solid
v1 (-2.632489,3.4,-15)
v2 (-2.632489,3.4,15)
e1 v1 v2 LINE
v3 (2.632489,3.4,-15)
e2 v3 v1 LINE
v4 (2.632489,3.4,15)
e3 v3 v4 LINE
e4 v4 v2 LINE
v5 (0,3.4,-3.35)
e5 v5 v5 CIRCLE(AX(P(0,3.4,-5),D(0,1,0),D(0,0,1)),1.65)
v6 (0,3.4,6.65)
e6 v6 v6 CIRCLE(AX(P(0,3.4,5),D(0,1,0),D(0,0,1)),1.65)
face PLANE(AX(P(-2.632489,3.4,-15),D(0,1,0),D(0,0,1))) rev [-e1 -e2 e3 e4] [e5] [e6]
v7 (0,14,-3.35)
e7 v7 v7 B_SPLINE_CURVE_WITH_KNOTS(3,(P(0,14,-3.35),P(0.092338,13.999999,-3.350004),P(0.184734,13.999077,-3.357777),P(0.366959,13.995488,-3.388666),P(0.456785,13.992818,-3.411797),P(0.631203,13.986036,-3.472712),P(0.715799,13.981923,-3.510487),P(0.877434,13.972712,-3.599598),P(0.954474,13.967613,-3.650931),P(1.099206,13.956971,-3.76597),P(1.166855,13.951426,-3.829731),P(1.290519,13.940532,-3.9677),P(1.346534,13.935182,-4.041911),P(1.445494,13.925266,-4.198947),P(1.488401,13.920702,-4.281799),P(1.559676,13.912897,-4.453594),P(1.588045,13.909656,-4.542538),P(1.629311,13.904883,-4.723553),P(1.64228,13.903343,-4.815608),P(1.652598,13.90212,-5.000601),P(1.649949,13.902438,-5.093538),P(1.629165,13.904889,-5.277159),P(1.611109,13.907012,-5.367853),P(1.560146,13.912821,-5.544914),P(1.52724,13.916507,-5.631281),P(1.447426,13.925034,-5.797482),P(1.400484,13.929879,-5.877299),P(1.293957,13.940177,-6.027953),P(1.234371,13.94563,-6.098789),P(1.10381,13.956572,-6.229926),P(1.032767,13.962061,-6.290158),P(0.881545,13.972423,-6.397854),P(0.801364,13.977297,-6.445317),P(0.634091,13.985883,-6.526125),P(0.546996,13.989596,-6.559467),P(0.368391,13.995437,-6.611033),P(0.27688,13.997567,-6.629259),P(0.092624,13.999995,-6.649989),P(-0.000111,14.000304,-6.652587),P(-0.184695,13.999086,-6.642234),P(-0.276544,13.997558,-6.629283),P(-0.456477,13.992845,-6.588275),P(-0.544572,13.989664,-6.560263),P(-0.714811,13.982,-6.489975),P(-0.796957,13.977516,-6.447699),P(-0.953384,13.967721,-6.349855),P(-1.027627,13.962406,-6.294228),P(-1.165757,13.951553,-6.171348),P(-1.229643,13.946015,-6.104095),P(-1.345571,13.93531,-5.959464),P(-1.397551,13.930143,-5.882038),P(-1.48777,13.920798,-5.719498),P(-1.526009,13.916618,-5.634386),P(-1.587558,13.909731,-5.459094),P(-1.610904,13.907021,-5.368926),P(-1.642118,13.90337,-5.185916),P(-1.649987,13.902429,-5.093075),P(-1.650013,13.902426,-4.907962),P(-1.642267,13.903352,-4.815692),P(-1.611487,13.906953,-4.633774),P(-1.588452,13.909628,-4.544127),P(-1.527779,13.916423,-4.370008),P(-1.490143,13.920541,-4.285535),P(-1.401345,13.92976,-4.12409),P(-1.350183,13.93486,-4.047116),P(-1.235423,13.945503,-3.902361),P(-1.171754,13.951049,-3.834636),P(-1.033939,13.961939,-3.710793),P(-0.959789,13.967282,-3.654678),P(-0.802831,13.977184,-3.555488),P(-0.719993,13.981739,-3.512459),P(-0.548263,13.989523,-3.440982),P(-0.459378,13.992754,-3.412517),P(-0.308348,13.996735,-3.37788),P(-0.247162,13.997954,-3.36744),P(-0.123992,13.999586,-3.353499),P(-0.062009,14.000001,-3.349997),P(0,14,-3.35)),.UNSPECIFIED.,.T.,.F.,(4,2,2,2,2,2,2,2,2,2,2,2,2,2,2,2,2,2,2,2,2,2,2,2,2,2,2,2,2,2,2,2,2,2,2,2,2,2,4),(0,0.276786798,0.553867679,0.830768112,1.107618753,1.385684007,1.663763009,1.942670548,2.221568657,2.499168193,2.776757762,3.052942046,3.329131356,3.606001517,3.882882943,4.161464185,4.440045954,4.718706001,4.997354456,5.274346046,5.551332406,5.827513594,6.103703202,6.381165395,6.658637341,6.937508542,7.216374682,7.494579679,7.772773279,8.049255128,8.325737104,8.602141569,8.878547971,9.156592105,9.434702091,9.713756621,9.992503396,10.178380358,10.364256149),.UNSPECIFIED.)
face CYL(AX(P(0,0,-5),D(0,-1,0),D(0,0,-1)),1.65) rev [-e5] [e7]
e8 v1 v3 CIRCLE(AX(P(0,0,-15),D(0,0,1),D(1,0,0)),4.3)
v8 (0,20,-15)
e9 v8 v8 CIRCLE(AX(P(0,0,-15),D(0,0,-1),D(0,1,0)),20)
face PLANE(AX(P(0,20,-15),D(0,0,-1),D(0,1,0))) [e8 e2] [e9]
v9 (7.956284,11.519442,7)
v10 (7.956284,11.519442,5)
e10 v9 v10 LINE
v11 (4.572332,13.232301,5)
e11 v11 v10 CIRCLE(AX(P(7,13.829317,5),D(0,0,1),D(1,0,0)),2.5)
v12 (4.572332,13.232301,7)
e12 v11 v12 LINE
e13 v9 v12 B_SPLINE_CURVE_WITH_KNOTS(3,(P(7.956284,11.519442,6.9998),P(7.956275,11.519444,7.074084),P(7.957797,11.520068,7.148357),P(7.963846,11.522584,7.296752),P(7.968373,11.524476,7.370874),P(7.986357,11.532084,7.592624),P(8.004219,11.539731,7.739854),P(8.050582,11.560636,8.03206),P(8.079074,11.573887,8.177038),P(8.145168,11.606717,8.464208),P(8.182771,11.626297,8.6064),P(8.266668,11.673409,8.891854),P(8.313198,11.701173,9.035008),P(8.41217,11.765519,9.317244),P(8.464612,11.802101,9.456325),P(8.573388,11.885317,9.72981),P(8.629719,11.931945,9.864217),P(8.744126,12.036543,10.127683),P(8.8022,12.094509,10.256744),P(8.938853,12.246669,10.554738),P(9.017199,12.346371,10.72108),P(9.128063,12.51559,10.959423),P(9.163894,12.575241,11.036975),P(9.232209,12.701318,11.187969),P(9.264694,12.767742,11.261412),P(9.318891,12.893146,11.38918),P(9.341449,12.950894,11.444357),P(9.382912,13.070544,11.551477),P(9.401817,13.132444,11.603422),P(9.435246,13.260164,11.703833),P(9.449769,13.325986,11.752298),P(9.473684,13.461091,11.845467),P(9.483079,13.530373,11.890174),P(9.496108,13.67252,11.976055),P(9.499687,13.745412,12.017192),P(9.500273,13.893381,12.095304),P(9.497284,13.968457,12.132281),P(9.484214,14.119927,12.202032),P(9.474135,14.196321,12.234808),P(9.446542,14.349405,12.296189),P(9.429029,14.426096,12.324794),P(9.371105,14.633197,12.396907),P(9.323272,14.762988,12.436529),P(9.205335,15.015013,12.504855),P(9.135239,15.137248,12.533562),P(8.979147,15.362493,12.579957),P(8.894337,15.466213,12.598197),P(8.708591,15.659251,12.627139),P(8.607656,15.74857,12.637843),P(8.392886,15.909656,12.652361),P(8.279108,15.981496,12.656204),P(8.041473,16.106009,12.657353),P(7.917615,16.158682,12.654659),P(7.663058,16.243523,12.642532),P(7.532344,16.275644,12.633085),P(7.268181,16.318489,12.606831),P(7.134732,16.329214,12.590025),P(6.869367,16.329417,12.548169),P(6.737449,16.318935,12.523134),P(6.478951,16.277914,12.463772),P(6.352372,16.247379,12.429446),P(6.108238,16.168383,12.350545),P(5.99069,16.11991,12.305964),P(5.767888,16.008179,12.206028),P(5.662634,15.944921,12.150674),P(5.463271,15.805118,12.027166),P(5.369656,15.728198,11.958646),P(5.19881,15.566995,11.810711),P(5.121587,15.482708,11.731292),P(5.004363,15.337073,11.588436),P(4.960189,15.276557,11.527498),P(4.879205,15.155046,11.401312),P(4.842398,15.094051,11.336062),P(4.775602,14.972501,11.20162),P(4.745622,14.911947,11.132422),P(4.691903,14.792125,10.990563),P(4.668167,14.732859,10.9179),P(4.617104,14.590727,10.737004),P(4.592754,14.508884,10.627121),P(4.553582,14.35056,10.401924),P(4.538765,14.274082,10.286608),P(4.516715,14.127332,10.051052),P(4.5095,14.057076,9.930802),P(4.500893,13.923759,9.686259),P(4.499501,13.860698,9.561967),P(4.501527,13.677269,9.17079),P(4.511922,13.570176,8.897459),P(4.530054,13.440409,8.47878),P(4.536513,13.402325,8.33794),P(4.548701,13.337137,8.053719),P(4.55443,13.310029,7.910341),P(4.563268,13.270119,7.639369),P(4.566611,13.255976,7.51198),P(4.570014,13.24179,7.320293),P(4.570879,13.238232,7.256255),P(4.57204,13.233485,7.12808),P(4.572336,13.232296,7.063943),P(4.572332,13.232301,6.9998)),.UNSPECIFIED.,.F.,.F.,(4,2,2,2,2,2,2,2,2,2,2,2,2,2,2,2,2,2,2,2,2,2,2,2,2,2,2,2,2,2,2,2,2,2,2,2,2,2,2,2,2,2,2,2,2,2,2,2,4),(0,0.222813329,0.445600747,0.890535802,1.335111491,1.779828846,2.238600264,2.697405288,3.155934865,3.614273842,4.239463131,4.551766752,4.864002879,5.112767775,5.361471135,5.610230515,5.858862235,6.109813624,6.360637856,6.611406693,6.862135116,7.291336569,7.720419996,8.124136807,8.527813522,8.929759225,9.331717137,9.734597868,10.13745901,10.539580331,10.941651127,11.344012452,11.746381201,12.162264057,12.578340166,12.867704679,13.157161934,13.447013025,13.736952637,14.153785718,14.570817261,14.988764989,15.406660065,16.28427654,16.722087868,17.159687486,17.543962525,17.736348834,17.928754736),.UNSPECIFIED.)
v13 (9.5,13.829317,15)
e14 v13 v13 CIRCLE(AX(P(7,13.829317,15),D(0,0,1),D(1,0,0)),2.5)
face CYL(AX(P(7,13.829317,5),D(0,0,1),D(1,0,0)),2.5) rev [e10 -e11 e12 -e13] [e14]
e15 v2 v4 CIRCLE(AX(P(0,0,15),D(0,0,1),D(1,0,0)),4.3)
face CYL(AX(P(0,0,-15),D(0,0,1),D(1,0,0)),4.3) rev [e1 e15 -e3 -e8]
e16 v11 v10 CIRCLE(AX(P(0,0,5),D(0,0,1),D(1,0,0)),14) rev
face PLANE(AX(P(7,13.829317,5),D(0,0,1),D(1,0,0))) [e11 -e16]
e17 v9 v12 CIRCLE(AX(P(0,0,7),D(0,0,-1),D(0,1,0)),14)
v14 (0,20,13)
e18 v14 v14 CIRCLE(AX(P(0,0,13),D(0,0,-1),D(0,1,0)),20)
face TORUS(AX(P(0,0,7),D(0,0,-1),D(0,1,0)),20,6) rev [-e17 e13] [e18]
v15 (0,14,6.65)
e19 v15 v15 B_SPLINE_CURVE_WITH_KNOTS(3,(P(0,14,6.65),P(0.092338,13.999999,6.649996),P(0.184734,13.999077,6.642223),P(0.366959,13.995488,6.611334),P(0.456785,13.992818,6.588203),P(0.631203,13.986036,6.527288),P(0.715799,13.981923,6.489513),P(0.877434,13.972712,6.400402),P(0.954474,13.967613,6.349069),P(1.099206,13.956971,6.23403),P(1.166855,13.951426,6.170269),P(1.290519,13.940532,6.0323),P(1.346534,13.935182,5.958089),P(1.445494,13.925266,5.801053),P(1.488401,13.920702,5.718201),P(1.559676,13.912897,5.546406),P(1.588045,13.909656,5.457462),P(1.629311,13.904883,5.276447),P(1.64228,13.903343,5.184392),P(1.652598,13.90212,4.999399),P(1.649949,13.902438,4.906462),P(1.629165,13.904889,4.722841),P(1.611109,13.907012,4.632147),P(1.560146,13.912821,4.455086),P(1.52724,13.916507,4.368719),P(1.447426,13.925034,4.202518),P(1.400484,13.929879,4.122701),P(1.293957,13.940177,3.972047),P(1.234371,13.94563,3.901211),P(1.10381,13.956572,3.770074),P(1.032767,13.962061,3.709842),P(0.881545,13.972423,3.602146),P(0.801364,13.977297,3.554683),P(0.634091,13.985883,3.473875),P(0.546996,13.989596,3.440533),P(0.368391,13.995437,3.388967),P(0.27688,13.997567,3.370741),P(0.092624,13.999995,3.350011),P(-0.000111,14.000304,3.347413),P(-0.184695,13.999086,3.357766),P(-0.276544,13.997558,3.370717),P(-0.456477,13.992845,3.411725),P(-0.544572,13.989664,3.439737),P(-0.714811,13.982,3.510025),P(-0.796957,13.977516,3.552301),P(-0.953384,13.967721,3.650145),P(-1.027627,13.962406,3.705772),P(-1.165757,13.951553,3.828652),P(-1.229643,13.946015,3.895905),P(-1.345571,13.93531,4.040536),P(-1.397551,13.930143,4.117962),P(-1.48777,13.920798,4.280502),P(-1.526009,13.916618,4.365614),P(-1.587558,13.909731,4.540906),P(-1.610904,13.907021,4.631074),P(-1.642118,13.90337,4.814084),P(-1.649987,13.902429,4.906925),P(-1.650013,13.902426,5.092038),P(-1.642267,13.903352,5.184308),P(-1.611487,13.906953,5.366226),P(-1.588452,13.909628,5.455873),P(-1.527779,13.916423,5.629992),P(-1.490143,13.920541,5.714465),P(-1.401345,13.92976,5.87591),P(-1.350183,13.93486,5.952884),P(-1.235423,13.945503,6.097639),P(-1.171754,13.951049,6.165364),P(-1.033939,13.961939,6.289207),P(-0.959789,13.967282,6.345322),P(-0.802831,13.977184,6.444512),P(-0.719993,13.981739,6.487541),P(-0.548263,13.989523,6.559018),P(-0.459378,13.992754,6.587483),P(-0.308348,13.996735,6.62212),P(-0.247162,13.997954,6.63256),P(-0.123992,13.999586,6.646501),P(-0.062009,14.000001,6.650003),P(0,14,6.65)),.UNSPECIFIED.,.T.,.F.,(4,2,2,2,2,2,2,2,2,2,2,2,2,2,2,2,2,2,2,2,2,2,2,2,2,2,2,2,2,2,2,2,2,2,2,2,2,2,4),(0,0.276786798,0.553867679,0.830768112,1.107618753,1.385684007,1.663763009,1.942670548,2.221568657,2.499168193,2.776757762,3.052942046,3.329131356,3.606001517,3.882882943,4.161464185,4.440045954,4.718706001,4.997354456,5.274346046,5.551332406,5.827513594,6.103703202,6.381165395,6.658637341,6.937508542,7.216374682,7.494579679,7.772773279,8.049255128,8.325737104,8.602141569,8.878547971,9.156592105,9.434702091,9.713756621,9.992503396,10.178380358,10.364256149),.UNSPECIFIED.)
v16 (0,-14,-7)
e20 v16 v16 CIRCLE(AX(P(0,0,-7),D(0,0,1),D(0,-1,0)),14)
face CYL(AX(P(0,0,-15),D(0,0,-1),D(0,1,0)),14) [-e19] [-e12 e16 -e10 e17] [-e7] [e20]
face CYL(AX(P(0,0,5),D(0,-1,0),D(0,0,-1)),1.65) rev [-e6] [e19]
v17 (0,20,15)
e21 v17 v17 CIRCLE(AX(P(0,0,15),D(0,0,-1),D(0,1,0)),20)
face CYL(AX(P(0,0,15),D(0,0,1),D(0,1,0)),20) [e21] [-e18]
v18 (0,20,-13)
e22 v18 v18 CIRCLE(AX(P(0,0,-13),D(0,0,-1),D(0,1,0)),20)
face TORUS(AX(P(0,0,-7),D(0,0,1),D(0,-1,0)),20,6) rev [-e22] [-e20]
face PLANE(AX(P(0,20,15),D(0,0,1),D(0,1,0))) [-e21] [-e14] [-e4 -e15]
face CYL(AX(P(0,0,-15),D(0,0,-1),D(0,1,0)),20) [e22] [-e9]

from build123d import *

# Parameters (mm, degrees)
CUT_EXTRUDE1_DEPTH                   = 42.231056256
SKETCH5_W                            = 1.65
SKETCH5_H                            = 20
TAP_DRILL_FOR_M4X0_7_TAP1_AT_2_COUNT = 2
TAP_DRILL_FOR_M4X0_7_TAP1_AT_2_PITCH = 10
FILLET_2_R                           = 6
SKETCH6_R                            = 2.5
CUT_EXTRUDE2_DEPTH                   = 10


with BuildPart() as part:
    # Sketch1 → Revolve1 (revolve)
    with BuildSketch(Plane(origin=(0, 0, 0), x_dir=(0, 0, -1), z_dir=(1, 0, 0))):
        Polygon((0, 0), (0, 14), (13, 14), (13, 20), (15, 20), (15, 0), align=None)
    revolve1 = revolve(axis=Axis((0, 0, -15), (0, 0, 1)))

    # Mirror1: Revolve1 across plane
    add(revolve1.mirror(Plane.XY))

    # Sketch2 → Cut-Extrude1 (cut, through all)
    with BuildSketch(Plane.XY.offset(15)):
        with BuildLine():
            Line((-2.632489316, 3.4), (2.632489316, 3.4))
            ThreePointArc((2.632489316, 3.4), (0, -4.3), (-2.632489316, 3.4))
        make_face()
    extrude(amount=-CUT_EXTRUDE1_DEPTH, mode=Mode.SUBTRACT)

    # Sketch5 → Tap Drill for M4x0.7 Tap1 (revolve, cut)
    with BuildSketch(Plane(origin=(0, 0, -5), x_dir=(0, 0, -1), z_dir=(1, 0, 0))):
        with Locations((0.825, 10)):
            Rectangle(SKETCH5_W, SKETCH5_H)
    tap_drill_for_m4x0_7_tap1 = revolve(axis=Axis((0, -6.35, -5), (0, 1, 0)), mode=Mode.SUBTRACT)

    # Tap Drill for M4x0.7 Tap1 at 2: Tap Drill for M4x0.7 Tap1 ×2
    with Locations(*[(0, 0, i * TAP_DRILL_FOR_M4X0_7_TAP1_AT_2_PITCH) for i in range(1, TAP_DRILL_FOR_M4X0_7_TAP1_AT_2_COUNT)]):
        add(tap_drill_for_m4x0_7_tap1, mode=Mode.SUBTRACT)

    # Fillet 2
    fillet_2_edges = [part.edges().sort_by_distance(p)[0] for p in [
        (0, -14, 13),
        (0, -14, -13),
    ]]
    fillet(fillet_2_edges, radius=FILLET_2_R - 0.0001)  # a hair under: the kernel refuses the full size

    # Sketch6 → Cut-Extrude2 (cut)
    with BuildSketch(Plane.XY.offset(15)):
        with Locations((7, 13.829316686)):
            Circle(SKETCH6_R)
    extrude(amount=-CUT_EXTRUDE2_DEPTH, mode=Mode.SUBTRACT)


solid = part.part
